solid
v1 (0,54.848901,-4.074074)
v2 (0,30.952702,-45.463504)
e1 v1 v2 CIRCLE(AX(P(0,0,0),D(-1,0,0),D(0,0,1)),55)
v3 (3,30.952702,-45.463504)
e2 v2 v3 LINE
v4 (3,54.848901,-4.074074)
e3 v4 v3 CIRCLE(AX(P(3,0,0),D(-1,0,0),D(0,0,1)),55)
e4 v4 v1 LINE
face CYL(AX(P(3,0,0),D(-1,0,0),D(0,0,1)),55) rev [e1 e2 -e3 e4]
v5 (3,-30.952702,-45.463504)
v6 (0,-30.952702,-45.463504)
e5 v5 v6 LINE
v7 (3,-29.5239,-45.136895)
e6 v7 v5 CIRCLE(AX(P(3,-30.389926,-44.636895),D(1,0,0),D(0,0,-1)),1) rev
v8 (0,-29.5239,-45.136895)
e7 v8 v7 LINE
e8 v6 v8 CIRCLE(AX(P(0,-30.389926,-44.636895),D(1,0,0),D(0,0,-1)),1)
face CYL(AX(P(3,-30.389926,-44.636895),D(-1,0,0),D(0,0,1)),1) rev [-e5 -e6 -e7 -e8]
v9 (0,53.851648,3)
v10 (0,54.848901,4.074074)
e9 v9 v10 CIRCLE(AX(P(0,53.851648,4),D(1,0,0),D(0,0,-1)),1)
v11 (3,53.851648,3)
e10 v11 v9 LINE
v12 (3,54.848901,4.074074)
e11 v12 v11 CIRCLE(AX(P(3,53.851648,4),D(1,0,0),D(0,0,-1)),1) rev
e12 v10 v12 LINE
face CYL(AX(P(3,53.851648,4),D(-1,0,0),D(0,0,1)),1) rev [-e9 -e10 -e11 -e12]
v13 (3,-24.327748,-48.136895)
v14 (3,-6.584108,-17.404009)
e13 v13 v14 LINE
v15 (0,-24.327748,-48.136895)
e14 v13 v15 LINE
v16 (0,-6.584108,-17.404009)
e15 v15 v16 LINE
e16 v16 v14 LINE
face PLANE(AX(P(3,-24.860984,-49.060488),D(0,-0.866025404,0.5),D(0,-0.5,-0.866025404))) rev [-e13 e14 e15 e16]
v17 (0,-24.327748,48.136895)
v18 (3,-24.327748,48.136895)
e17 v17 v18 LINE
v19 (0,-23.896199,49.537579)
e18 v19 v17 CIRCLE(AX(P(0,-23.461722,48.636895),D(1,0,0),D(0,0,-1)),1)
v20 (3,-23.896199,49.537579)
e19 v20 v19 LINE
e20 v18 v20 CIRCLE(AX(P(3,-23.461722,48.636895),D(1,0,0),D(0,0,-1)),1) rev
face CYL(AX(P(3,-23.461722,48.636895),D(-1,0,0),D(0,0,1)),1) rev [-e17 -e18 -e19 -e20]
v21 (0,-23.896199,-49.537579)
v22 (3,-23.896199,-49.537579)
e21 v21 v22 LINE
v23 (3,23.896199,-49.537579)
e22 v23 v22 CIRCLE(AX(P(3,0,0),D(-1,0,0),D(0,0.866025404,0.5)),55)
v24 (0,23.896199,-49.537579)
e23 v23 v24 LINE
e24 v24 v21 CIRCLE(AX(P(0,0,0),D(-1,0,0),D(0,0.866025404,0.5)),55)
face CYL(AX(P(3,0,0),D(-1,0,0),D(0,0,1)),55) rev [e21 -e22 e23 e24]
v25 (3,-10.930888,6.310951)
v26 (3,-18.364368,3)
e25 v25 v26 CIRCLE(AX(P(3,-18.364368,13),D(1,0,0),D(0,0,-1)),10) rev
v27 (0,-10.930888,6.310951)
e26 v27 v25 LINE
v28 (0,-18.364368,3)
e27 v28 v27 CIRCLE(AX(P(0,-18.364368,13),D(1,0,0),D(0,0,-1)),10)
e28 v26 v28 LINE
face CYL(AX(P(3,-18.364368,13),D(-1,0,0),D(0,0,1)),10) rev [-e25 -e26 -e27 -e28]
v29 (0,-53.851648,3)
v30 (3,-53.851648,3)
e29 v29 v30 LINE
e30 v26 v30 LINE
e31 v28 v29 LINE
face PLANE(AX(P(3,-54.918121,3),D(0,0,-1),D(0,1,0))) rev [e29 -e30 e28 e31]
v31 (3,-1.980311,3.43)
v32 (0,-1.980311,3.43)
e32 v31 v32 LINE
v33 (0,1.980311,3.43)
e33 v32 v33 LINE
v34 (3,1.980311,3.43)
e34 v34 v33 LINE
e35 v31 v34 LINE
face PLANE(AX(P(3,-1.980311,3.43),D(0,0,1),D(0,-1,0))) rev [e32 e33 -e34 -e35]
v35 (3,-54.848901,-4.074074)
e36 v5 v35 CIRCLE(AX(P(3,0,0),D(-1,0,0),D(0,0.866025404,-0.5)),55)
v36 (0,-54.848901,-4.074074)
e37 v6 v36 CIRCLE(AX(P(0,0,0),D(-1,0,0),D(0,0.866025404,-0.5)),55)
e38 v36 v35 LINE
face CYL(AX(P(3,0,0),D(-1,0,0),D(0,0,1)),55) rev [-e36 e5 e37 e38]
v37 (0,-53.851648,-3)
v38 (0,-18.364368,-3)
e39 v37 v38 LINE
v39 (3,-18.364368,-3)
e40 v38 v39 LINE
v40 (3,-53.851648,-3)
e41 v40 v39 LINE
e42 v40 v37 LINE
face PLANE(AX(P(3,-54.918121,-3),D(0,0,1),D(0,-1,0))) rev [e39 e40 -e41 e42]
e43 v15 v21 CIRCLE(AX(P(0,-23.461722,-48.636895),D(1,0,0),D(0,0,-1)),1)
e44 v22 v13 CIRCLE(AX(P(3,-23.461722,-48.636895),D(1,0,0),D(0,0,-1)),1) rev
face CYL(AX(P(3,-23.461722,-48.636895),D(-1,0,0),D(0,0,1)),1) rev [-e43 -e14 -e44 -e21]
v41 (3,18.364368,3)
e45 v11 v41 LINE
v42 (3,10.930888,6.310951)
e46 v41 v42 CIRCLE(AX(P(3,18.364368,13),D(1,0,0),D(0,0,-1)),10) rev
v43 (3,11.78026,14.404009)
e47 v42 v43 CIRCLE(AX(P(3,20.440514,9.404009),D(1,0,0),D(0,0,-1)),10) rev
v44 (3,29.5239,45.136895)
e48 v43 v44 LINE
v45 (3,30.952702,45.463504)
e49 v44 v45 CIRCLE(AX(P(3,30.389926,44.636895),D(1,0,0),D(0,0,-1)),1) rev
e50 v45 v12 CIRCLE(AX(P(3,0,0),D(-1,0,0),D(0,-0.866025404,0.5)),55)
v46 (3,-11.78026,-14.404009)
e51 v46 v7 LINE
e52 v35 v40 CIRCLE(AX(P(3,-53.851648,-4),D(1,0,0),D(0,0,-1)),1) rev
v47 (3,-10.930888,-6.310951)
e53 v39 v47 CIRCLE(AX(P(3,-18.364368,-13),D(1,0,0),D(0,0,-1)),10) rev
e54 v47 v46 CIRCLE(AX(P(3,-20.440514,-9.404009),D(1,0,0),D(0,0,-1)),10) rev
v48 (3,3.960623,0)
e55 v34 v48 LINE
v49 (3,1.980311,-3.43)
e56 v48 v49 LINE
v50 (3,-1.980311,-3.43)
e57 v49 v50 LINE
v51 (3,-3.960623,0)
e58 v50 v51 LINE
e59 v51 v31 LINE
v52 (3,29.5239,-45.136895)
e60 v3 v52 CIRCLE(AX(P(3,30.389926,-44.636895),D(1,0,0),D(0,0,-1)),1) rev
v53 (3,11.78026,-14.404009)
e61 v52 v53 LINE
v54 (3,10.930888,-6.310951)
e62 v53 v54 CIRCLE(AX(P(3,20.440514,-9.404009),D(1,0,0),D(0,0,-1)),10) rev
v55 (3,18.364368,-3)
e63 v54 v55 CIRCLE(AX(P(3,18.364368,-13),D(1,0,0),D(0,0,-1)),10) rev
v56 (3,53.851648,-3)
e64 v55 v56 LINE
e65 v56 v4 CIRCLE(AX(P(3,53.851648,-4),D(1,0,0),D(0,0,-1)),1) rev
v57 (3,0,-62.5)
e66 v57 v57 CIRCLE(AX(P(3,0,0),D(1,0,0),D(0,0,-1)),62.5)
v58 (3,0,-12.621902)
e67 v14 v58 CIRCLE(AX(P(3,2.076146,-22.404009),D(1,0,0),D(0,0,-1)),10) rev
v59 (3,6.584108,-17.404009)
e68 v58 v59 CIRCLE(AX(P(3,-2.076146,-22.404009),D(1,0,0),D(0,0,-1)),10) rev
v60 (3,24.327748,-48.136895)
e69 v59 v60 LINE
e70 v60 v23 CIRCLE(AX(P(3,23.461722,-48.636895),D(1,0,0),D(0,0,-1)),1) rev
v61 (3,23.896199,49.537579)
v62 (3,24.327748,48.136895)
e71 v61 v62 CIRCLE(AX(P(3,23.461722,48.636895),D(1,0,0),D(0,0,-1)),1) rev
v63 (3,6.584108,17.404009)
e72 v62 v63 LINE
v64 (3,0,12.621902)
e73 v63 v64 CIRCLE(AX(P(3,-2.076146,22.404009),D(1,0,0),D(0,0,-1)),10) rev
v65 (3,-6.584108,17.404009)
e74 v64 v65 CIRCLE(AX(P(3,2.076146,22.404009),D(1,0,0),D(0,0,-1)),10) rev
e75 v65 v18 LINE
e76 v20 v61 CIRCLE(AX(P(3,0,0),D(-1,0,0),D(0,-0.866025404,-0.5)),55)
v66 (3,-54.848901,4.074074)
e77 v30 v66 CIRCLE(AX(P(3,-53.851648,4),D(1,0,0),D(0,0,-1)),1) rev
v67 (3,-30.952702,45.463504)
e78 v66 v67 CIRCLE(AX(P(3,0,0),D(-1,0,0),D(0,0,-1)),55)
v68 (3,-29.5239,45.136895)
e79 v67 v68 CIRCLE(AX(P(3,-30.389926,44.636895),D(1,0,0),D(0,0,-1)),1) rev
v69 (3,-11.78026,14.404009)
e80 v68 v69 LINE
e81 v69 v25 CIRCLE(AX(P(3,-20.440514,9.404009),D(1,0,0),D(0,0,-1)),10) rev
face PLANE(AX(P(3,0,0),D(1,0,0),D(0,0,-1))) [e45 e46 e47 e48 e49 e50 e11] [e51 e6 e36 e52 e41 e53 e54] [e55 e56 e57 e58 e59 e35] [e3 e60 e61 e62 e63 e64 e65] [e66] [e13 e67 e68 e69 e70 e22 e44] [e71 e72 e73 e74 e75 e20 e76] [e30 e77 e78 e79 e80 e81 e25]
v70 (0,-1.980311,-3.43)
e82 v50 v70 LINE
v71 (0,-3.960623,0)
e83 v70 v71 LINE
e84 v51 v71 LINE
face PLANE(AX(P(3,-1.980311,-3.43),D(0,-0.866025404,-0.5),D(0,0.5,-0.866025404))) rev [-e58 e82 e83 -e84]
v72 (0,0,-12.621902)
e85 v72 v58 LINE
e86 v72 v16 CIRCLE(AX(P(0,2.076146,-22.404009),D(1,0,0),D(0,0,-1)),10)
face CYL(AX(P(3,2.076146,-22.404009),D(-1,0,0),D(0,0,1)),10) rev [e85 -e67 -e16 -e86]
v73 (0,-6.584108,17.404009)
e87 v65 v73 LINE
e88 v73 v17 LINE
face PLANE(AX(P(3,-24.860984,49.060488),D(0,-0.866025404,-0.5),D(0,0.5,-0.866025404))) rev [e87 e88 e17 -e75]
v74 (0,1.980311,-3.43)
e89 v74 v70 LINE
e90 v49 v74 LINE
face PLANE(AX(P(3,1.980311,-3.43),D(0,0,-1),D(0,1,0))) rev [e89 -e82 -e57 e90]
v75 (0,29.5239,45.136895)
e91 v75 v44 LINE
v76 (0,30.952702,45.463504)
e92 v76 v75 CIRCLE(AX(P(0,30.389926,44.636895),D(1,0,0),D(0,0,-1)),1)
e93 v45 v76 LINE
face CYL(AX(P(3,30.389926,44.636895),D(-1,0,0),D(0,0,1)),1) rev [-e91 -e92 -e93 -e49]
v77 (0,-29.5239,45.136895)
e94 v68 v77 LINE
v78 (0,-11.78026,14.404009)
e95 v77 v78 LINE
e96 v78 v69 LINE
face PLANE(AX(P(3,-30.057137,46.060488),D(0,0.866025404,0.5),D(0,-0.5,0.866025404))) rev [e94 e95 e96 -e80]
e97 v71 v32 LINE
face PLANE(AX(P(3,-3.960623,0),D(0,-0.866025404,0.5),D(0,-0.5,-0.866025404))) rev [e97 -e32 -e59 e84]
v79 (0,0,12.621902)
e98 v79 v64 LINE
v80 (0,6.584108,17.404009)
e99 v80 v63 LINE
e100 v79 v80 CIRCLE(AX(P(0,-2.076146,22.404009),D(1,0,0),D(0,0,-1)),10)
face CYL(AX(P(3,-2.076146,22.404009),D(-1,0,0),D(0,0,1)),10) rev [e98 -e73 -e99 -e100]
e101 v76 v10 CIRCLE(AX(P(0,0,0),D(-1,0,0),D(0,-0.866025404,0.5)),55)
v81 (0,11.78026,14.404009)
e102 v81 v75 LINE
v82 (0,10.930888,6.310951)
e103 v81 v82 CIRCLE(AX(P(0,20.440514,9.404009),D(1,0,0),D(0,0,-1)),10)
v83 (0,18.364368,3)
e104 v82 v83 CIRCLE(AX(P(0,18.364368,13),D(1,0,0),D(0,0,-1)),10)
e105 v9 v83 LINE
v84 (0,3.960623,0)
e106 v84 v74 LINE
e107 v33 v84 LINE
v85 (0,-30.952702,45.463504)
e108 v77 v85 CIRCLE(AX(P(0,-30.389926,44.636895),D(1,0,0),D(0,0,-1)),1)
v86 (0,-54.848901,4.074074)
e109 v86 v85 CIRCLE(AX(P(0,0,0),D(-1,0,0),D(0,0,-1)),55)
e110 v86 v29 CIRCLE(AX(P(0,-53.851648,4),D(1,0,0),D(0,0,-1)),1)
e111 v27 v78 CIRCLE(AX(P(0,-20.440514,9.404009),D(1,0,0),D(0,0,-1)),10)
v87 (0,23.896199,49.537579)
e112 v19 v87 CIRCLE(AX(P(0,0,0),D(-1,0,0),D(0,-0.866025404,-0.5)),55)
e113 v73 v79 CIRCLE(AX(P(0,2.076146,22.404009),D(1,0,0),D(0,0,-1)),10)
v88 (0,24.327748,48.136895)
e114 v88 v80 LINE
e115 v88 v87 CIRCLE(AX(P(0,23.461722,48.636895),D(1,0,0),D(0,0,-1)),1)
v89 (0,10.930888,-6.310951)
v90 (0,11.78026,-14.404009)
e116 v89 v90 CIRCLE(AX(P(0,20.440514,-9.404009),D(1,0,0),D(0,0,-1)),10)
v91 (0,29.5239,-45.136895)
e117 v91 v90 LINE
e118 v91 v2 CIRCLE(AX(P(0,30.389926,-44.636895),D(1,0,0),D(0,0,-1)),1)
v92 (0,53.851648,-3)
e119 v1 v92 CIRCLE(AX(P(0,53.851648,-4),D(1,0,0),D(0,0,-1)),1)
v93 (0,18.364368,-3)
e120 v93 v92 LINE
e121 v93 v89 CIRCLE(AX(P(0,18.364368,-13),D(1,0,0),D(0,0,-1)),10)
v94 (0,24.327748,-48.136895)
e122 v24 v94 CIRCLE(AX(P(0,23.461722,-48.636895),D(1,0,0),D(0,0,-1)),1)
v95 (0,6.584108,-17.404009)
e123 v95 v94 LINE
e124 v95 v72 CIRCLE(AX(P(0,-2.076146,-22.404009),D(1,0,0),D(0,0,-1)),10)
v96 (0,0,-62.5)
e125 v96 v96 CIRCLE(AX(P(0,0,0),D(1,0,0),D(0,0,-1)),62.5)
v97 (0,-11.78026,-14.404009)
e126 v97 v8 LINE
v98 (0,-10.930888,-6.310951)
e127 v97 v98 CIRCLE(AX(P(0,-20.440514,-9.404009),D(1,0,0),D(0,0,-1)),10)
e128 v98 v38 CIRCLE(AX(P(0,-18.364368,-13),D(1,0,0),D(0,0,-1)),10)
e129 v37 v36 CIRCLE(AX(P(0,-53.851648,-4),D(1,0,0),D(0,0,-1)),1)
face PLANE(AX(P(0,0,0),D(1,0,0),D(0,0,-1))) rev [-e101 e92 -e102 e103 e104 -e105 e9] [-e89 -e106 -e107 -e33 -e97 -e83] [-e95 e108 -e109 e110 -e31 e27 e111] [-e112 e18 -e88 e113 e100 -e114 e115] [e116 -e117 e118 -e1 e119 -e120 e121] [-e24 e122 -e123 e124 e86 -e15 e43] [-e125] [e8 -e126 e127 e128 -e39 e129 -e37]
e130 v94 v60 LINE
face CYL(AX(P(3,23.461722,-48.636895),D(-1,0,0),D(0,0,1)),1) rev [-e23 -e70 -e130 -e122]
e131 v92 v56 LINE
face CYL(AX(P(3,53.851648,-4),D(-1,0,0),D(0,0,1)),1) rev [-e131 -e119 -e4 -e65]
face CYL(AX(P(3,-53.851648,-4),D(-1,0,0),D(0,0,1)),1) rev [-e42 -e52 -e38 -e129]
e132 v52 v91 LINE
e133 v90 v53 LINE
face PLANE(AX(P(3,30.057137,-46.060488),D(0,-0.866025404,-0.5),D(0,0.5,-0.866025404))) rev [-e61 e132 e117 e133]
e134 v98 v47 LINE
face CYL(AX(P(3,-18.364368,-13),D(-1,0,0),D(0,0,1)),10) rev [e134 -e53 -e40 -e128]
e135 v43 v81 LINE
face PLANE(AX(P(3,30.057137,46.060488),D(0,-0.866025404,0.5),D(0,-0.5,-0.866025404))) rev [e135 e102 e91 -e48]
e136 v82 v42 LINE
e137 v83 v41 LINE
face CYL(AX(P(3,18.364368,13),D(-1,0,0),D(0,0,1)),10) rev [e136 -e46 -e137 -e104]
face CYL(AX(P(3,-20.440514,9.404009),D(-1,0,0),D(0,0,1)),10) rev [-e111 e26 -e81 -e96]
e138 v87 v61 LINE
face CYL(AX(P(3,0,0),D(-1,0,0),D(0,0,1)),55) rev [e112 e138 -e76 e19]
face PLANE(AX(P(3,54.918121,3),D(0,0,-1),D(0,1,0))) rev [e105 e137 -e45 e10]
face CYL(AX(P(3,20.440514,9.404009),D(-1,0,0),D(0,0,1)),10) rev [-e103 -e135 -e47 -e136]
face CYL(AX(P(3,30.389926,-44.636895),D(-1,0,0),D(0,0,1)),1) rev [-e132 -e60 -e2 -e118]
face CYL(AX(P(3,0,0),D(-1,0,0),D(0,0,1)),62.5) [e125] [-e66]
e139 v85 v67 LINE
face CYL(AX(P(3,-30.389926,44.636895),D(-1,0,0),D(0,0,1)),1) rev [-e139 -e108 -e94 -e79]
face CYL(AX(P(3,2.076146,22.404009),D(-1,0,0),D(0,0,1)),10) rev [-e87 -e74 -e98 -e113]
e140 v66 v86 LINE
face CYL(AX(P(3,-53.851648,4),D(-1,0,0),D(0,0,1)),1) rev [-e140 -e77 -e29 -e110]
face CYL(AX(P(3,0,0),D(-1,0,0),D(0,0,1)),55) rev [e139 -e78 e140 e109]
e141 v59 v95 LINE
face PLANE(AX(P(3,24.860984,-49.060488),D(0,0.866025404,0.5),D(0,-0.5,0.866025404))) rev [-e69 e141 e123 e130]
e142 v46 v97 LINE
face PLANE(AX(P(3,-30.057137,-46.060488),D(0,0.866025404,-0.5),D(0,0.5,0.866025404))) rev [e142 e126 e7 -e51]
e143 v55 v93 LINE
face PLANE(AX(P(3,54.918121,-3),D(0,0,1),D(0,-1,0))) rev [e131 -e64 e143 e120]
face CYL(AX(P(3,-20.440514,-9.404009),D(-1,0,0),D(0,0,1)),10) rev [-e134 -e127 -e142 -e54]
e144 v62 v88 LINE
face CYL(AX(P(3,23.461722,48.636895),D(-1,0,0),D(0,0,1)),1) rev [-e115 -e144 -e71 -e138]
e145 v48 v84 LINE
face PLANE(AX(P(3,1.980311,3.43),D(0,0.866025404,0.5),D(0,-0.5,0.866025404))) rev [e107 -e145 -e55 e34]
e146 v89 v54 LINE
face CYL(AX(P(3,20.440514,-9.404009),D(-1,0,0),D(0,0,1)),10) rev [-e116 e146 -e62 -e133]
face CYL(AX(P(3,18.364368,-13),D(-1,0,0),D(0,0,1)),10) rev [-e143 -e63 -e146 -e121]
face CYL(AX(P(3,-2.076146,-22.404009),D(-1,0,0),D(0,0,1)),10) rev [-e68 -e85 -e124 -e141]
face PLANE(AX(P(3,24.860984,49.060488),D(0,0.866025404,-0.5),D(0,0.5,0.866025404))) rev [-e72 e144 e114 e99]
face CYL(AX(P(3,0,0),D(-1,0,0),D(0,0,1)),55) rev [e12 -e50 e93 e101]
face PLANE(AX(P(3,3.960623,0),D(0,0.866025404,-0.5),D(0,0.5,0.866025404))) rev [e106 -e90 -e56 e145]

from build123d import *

# Parameters (mm, degrees)
SKETCH1_R           = 62.5
BOSS_EXTRUDE1_DEPTH = 3
CUT_EXTRUDE5_DEPTH  = 89.439244682
CIRPATTERN4_COUNT   = 6
CUT_EXTRUDE6_DEPTH  = 89.439244682
FILLET1_R           = 10
FILLET2_R           = 1


with BuildPart() as part:
    # Sketch1 → Boss-Extrude1 (new body)
    with BuildSketch(Plane(origin=(0, 0, 0), x_dir=(0, 0, -1), z_dir=(1, 0, 0))):
        Circle(SKETCH1_R)
    extrude(amount=BOSS_EXTRUDE1_DEPTH)

    # Sketch6 → Cut-Extrude5 (cut, through all)
    with BuildSketch(Plane.ZY):
        with BuildLine():
            Line((-3, 54.918120871), (-3, 12.1346611))
            ThreePointArc((-3, 12.1346611), (-6.25, 10.825317547), (-9.008924778, 8.665406761))
            Line((-9.008924778, 8.665406761), (-46.060487802, 30.057136647))
            ThreePointArc((-46.060487802, 30.057136647), (-27.5, 47.631397208), (-3, 54.918120871))
        make_face()
    cut_extrude5 = extrude(amount=-CUT_EXTRUDE5_DEPTH, mode=Mode.SUBTRACT)

    # CirPattern4: Cut-Extrude5 ×6 about axis
    cirpattern4_axis = Axis((0, 0, 0), (1, 0, 0))
    for i in range(1, CIRPATTERN4_COUNT):
        add(cut_extrude5.rotate(cirpattern4_axis, i * 360 / CIRPATTERN4_COUNT), mode=Mode.SUBTRACT)

    # Sketch7 → Cut-Extrude6 (cut, through all)
    with BuildSketch(Plane.ZY):
        Polygon((0, 3.960622847), (-3.43, 1.980311423), (-3.43, -1.980311423), (0, -3.960622847), (3.43, -1.980311423), (3.43, 1.980311423), align=None)
    extrude(amount=-CUT_EXTRUDE6_DEPTH, mode=Mode.SUBTRACT)

    # Fillet1
    # the kernel refuses this fillet: 10 mm, written as the material it adds along each edge
    with BuildSketch(Plane(origin=(0, 12.1346611, 3), x_dir=(0, 1, 0), z_dir=(1, 0, 0)), Plane(origin=(0, 3.469254338, 12.008924778), x_dir=(0, 0.5000000000000027, 0.8660254037844372), z_dir=(1, 0, 0)), Plane(origin=(0, -8.665406761, 9.008924778), x_dir=(0, -0.4999999999999975, 0.8660254037844402), z_dir=(1, 0, 0)), Plane(origin=(0, -12.1346611, -3), x_dir=(0, -1, 0), z_dir=(1, 0, 0)), Plane(origin=(0, -3.469254338, -12.008924778), x_dir=(0, -0.500000000000002, -0.8660254037844375), z_dir=(1, 0, 0)), Plane(origin=(0, 8.665406761, -9.008924778), x_dir=(0, 0.4999999999999975, -0.86602540378444), z_dir=(1, 0, 0))) as fillet1_piece_1:
        with BuildLine():
            CenterArc((6.229706573, 10), FILLET1_R, 215.294394677, 54.705605323)
            ThreePointArc((-1.932234615, 4.222222222), (-0.768344169, 2.201618925), (0, 0))
            Line((0, 0), (6.229706573, 0))
        make_face()
    extrude(amount=3)
    with BuildSketch(Plane(origin=(0, 8.665406761, 9.008924778), x_dir=(0, 0.5000000000000008, 0.8660254037844382), z_dir=(1, 0, 0)), Plane(origin=(0, -3.469254338, 12.008924778), x_dir=(0, -0.49999999999999983, 0.8660254037844387), z_dir=(1, 0, 0)), Plane(origin=(0, -12.1346611, 3), x_dir=(0, -1, 0), z_dir=(1, 0, 0)), Plane(origin=(0, -8.665406761, -9.008924778), x_dir=(0, -0.5000000000000001, -0.8660254037844385), z_dir=(1, 0, 0)), Plane(origin=(0, 3.469254338, -12.008924778), x_dir=(0, 0.5000000000000001, -0.8660254037844385), z_dir=(1, 0, 0)), Plane(origin=(0, 12.1346611, -3), x_dir=(0, 1, 0), z_dir=(1, 0, 0))) as fillet1_piece_2:
        with BuildLine():
            CenterArc((6.229706573, -10), FILLET1_R, 90, 54.705605323)
            ThreePointArc((-1.932234615, -4.222222222), (-0.768344169, -2.201618925), (0, 0))
            Line((0, 0), (6.229706573, 0))
        make_face()
    extrude(amount=3)

    # Fillet2
    fillet2_edges = [part.edges().sort_by_distance(p)[0] for p in [
        (1.5, 54.918120871, -3),
        (1.5, -54.918120871, -3),
        (1.5, -30.057136647, -46.060487802),
        (1.5, -30.057136647, 46.060487802),
        (1.5, -54.918120871, 3),
        (1.5, 54.918120871, 3),
        (1.5, 30.057136647, 46.060487802),
        (1.5, 24.860984224, 49.060487802),
        (1.5, -24.860984224, 49.060487802),
        (1.5, -24.860984224, -49.060487802),
        (1.5, 24.860984224, -49.060487802),
        (1.5, 30.057136647, -46.060487802),
    ]]
    fillet(fillet2_edges, radius=FILLET2_R)


solid = part.part
